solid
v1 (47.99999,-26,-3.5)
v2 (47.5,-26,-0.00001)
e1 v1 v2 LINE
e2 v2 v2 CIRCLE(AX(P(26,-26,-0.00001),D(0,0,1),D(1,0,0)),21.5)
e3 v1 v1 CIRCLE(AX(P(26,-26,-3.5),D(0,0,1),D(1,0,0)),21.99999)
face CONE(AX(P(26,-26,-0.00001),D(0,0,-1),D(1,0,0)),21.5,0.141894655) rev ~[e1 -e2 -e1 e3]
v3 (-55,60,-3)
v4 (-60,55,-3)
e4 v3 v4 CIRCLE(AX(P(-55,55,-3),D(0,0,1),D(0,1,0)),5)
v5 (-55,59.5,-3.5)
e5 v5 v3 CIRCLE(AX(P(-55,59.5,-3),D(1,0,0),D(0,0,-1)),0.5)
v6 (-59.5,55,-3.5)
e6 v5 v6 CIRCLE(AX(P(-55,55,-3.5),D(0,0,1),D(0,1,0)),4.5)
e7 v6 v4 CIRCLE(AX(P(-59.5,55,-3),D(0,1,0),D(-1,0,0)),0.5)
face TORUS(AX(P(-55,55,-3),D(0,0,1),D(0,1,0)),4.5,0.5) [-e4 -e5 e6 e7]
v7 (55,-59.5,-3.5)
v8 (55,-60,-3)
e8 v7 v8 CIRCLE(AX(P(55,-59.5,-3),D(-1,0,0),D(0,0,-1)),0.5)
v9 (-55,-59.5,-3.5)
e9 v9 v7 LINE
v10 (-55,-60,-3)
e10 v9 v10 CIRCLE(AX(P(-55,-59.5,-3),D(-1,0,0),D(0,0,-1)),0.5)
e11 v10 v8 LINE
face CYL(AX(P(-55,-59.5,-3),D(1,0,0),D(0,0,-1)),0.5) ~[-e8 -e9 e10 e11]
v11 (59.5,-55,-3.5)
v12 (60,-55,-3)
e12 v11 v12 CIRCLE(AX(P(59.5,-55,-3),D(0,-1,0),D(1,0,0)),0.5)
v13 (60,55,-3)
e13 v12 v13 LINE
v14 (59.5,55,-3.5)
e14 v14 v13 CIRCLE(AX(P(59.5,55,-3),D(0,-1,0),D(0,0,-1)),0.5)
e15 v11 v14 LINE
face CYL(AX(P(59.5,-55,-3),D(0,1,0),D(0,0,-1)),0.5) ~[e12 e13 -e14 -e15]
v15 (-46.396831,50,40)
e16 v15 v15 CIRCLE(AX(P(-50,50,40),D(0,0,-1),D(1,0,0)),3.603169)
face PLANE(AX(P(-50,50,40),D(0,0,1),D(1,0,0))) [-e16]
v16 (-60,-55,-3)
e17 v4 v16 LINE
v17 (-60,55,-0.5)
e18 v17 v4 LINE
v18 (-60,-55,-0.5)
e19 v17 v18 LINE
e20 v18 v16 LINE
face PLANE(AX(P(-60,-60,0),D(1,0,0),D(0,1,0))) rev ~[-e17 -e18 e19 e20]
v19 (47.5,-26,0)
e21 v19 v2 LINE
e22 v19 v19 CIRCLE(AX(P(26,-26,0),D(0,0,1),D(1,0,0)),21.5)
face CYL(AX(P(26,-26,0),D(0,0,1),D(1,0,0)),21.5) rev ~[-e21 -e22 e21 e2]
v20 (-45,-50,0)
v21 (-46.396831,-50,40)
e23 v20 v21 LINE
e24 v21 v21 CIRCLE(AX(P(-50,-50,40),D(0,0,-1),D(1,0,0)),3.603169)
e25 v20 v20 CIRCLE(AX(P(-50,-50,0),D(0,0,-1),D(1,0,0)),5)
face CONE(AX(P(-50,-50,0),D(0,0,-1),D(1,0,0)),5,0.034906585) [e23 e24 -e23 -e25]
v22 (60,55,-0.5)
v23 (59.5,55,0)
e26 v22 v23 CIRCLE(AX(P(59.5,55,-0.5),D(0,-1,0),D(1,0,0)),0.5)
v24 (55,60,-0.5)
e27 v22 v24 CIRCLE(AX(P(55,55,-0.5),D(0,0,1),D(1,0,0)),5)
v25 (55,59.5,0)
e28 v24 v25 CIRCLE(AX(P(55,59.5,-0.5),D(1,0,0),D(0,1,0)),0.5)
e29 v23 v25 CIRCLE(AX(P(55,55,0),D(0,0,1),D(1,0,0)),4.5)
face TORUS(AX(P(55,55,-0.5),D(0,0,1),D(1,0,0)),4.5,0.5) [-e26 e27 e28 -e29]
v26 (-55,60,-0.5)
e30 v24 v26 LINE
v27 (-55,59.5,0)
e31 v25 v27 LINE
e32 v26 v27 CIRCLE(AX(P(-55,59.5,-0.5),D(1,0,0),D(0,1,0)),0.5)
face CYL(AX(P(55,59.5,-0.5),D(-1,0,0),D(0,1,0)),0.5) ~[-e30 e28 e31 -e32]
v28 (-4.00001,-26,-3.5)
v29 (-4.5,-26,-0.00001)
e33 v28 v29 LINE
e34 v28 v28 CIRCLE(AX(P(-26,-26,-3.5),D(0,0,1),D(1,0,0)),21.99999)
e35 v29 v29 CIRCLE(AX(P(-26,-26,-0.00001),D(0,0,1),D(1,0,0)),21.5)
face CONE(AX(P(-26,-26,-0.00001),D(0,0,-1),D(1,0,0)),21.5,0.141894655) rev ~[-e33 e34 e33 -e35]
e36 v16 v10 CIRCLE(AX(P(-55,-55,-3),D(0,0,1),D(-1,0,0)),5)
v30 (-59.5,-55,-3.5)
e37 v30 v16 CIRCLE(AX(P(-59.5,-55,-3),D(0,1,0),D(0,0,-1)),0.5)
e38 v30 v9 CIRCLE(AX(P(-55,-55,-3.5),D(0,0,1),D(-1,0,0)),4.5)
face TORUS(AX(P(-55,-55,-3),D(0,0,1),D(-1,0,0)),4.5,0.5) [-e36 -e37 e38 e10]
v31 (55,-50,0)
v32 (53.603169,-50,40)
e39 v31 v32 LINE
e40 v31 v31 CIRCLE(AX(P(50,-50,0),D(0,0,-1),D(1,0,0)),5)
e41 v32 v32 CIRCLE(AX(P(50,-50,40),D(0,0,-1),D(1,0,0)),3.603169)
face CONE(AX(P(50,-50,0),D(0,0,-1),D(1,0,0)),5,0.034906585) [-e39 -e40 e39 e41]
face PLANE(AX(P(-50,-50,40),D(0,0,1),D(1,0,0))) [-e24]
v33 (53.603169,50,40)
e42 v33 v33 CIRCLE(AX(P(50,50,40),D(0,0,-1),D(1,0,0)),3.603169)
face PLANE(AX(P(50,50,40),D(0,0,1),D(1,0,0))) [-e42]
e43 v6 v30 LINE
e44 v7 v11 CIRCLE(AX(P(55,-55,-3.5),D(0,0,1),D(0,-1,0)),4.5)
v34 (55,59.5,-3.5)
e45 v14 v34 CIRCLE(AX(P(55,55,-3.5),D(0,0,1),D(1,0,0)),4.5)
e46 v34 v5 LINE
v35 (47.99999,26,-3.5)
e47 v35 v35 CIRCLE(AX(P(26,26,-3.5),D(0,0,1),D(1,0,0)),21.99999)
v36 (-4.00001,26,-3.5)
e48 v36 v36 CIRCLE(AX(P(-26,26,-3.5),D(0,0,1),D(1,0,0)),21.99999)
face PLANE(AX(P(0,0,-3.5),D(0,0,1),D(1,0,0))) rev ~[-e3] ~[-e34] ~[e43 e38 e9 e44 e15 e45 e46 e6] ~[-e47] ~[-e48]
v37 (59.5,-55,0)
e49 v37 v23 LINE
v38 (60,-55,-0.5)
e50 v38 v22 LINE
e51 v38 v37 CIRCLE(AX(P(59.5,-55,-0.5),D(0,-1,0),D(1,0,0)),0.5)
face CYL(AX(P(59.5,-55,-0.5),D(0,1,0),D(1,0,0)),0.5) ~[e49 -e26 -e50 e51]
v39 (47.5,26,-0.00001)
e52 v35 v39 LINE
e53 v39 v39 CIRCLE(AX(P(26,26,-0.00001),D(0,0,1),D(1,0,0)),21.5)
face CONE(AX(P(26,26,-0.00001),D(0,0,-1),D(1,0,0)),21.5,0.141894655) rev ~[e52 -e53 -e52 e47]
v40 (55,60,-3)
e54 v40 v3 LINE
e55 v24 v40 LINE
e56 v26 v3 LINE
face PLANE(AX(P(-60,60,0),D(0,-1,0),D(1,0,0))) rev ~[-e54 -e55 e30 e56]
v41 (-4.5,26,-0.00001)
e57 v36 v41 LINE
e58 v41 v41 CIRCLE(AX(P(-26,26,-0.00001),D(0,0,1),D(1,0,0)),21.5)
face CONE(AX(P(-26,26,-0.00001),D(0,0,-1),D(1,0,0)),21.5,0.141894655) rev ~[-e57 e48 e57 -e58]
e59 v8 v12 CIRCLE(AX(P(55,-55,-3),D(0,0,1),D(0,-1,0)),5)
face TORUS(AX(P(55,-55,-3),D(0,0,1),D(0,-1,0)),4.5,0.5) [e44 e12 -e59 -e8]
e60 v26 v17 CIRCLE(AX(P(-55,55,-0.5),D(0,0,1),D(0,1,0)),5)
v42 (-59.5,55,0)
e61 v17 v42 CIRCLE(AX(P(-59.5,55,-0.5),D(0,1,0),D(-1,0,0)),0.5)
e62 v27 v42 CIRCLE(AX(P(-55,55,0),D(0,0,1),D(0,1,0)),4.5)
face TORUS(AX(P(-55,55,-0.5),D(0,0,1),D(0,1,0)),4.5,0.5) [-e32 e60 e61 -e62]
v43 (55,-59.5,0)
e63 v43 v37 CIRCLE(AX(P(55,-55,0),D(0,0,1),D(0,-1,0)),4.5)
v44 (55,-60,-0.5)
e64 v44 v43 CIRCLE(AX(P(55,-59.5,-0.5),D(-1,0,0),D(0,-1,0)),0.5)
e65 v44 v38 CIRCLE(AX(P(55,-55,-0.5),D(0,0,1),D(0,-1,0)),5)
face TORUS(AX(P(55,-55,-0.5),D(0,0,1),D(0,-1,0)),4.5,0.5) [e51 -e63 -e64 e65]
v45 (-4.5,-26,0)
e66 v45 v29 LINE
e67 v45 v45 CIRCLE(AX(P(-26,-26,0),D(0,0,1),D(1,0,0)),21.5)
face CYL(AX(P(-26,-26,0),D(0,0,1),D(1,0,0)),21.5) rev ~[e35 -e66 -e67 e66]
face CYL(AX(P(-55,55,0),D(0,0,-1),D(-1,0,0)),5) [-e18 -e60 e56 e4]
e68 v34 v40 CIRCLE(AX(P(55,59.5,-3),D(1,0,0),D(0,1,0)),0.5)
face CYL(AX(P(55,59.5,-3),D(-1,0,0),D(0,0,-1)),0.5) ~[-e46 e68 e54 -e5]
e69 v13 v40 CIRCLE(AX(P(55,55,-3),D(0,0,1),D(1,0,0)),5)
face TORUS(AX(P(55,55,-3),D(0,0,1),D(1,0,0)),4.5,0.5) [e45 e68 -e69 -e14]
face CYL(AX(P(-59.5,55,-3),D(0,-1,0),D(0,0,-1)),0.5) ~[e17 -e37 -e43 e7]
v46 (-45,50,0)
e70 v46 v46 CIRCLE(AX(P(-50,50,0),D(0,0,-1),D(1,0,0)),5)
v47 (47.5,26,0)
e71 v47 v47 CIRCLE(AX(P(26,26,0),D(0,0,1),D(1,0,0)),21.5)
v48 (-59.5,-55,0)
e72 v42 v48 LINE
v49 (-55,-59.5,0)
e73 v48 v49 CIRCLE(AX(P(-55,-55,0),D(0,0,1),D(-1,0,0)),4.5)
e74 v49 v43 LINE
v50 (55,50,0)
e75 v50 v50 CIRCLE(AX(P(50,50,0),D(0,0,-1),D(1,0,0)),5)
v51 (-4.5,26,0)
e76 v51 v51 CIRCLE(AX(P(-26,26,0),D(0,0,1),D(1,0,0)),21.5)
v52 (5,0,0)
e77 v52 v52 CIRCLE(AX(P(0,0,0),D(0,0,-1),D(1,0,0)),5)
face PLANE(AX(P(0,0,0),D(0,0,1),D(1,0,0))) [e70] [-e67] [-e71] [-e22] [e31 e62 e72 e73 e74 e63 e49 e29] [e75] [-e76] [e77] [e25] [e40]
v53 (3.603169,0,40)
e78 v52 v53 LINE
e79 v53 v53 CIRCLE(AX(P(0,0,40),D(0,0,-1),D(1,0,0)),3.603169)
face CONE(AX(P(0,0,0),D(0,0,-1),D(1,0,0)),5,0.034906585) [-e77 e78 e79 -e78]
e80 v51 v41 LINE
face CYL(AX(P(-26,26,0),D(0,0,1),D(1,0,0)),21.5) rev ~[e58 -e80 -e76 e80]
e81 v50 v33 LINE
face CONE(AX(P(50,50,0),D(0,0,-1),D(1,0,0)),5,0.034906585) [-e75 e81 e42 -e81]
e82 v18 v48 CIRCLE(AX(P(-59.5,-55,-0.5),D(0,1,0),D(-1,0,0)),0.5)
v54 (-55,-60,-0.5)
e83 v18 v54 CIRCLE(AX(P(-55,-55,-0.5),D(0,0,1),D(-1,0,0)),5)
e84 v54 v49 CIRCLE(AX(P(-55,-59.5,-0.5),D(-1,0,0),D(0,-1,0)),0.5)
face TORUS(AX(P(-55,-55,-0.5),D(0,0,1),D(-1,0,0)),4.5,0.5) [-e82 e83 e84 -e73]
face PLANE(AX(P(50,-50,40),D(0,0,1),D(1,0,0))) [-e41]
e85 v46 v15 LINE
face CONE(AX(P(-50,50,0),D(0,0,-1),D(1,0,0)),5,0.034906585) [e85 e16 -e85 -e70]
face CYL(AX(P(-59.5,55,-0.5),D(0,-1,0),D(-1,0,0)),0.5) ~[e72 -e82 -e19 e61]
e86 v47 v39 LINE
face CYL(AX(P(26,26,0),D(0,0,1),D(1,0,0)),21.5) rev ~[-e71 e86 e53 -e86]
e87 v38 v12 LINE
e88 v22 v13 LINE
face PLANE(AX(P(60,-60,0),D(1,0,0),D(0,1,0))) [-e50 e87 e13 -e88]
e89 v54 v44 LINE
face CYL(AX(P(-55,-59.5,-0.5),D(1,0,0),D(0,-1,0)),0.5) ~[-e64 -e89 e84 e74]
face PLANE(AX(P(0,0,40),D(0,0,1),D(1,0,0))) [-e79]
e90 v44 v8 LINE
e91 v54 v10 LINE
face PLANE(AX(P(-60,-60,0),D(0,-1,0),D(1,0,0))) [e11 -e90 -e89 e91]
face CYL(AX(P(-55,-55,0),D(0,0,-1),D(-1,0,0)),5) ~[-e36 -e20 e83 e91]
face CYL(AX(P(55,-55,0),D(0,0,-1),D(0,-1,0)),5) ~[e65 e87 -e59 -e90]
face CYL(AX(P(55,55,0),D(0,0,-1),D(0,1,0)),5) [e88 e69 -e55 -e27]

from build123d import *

# Parameters (mm, degrees)
F0_W     = 120
F0_H     = 120
F0_R     = 5
F0_R_2   = 21.5
F1_DEPTH = 3.5
F2_DEPTH = 40
F2_TAPER = 2
F3_R     = 5
F4_SIZE2 = 3.49999
F4_SIZE  = 0.49999
F5_R     = 0.5


# Not quite as in the source:
# - a fillet or chamfer is up to 0.001 mm smaller than in the source, because OpenCascade refuses the exact size


with BuildPart() as f1:
    # F0 (on Top) → F1 (new body)
    with BuildSketch(Plane.XY):
        Rectangle(F0_W, F0_H)
        with Locations((-50, -50)):
            Circle(F0_R, mode=Mode.SUBTRACT)
        with Locations((-26, -26)):
            Circle(F0_R_2, mode=Mode.SUBTRACT)
        with Locations((50, -50)):
            Circle(F0_R, mode=Mode.SUBTRACT)
        with Locations((26, -26)):
            Circle(F0_R_2, mode=Mode.SUBTRACT)
        with Locations((-26, 26)):
            Circle(F0_R_2, mode=Mode.SUBTRACT)
        with Locations((-50, 50)):
            Circle(F0_R, mode=Mode.SUBTRACT)
        Circle(F0_R, mode=Mode.SUBTRACT)
        with Locations((26, 26)):
            Circle(F0_R_2, mode=Mode.SUBTRACT)
        with Locations((50, 50)):
            Circle(F0_R, mode=Mode.SUBTRACT)
        with Locations((-50, 50)):
            Circle(F0_R)
        Circle(F0_R)
        with Locations((50, 50)):
            Circle(F0_R)
        with Locations((-50, -50)):
            Circle(F0_R)
        with Locations((50, -50)):
            Circle(F0_R)
    extrude(amount=-F1_DEPTH)

    # F0 (on Top) → F2 (join)
    with BuildSketch(Plane.XY):
        with Locations((-50, 50)):
            Circle(F0_R)
        Circle(F0_R)
        with Locations((50, 50)):
            Circle(F0_R)
        with Locations((50, -50)):
            Circle(F0_R)
        with Locations((-50, -50)):
            Circle(F0_R)
    extrude(amount=F2_DEPTH, taper=F2_TAPER)

    # F3
    f3_edges = [f1.edges().sort_by_distance(p)[0] for p in [
        (-60, -60, -1.75),
        (-60, 60, -1.75),
        (60, 60, -1.75),
        (60, -60, -1.75),
    ]]
    fillet(f3_edges, radius=F3_R)

    # F4 (size 0.5 and 3.5 in the source; OpenCascade refuses exactly that, so slightly less here)
    f4_edges = [f1.edges().sort_by_distance(p)[0] for p in [
        (4.5, 26, -3.5),
        (-47.5, 26, -3.5),
        (-47.5, -26, -3.5),
        (4.5, -26, -3.5),
    ]]
    f4_side = f1.faces().sort_by_distance((0, 0, -3.5))[0]
    chamfer(f4_edges, length=F4_SIZE, length2=F4_SIZE2, reference=f4_side)

    # F5
    f5_edges = [f1.edges().sort_by_distance(p)[0] for p in [
        (0, -60, -3.5),
        (0, -60, 0),
    ]]
    fillet(f5_edges, radius=F5_R)


solid = f1.part
